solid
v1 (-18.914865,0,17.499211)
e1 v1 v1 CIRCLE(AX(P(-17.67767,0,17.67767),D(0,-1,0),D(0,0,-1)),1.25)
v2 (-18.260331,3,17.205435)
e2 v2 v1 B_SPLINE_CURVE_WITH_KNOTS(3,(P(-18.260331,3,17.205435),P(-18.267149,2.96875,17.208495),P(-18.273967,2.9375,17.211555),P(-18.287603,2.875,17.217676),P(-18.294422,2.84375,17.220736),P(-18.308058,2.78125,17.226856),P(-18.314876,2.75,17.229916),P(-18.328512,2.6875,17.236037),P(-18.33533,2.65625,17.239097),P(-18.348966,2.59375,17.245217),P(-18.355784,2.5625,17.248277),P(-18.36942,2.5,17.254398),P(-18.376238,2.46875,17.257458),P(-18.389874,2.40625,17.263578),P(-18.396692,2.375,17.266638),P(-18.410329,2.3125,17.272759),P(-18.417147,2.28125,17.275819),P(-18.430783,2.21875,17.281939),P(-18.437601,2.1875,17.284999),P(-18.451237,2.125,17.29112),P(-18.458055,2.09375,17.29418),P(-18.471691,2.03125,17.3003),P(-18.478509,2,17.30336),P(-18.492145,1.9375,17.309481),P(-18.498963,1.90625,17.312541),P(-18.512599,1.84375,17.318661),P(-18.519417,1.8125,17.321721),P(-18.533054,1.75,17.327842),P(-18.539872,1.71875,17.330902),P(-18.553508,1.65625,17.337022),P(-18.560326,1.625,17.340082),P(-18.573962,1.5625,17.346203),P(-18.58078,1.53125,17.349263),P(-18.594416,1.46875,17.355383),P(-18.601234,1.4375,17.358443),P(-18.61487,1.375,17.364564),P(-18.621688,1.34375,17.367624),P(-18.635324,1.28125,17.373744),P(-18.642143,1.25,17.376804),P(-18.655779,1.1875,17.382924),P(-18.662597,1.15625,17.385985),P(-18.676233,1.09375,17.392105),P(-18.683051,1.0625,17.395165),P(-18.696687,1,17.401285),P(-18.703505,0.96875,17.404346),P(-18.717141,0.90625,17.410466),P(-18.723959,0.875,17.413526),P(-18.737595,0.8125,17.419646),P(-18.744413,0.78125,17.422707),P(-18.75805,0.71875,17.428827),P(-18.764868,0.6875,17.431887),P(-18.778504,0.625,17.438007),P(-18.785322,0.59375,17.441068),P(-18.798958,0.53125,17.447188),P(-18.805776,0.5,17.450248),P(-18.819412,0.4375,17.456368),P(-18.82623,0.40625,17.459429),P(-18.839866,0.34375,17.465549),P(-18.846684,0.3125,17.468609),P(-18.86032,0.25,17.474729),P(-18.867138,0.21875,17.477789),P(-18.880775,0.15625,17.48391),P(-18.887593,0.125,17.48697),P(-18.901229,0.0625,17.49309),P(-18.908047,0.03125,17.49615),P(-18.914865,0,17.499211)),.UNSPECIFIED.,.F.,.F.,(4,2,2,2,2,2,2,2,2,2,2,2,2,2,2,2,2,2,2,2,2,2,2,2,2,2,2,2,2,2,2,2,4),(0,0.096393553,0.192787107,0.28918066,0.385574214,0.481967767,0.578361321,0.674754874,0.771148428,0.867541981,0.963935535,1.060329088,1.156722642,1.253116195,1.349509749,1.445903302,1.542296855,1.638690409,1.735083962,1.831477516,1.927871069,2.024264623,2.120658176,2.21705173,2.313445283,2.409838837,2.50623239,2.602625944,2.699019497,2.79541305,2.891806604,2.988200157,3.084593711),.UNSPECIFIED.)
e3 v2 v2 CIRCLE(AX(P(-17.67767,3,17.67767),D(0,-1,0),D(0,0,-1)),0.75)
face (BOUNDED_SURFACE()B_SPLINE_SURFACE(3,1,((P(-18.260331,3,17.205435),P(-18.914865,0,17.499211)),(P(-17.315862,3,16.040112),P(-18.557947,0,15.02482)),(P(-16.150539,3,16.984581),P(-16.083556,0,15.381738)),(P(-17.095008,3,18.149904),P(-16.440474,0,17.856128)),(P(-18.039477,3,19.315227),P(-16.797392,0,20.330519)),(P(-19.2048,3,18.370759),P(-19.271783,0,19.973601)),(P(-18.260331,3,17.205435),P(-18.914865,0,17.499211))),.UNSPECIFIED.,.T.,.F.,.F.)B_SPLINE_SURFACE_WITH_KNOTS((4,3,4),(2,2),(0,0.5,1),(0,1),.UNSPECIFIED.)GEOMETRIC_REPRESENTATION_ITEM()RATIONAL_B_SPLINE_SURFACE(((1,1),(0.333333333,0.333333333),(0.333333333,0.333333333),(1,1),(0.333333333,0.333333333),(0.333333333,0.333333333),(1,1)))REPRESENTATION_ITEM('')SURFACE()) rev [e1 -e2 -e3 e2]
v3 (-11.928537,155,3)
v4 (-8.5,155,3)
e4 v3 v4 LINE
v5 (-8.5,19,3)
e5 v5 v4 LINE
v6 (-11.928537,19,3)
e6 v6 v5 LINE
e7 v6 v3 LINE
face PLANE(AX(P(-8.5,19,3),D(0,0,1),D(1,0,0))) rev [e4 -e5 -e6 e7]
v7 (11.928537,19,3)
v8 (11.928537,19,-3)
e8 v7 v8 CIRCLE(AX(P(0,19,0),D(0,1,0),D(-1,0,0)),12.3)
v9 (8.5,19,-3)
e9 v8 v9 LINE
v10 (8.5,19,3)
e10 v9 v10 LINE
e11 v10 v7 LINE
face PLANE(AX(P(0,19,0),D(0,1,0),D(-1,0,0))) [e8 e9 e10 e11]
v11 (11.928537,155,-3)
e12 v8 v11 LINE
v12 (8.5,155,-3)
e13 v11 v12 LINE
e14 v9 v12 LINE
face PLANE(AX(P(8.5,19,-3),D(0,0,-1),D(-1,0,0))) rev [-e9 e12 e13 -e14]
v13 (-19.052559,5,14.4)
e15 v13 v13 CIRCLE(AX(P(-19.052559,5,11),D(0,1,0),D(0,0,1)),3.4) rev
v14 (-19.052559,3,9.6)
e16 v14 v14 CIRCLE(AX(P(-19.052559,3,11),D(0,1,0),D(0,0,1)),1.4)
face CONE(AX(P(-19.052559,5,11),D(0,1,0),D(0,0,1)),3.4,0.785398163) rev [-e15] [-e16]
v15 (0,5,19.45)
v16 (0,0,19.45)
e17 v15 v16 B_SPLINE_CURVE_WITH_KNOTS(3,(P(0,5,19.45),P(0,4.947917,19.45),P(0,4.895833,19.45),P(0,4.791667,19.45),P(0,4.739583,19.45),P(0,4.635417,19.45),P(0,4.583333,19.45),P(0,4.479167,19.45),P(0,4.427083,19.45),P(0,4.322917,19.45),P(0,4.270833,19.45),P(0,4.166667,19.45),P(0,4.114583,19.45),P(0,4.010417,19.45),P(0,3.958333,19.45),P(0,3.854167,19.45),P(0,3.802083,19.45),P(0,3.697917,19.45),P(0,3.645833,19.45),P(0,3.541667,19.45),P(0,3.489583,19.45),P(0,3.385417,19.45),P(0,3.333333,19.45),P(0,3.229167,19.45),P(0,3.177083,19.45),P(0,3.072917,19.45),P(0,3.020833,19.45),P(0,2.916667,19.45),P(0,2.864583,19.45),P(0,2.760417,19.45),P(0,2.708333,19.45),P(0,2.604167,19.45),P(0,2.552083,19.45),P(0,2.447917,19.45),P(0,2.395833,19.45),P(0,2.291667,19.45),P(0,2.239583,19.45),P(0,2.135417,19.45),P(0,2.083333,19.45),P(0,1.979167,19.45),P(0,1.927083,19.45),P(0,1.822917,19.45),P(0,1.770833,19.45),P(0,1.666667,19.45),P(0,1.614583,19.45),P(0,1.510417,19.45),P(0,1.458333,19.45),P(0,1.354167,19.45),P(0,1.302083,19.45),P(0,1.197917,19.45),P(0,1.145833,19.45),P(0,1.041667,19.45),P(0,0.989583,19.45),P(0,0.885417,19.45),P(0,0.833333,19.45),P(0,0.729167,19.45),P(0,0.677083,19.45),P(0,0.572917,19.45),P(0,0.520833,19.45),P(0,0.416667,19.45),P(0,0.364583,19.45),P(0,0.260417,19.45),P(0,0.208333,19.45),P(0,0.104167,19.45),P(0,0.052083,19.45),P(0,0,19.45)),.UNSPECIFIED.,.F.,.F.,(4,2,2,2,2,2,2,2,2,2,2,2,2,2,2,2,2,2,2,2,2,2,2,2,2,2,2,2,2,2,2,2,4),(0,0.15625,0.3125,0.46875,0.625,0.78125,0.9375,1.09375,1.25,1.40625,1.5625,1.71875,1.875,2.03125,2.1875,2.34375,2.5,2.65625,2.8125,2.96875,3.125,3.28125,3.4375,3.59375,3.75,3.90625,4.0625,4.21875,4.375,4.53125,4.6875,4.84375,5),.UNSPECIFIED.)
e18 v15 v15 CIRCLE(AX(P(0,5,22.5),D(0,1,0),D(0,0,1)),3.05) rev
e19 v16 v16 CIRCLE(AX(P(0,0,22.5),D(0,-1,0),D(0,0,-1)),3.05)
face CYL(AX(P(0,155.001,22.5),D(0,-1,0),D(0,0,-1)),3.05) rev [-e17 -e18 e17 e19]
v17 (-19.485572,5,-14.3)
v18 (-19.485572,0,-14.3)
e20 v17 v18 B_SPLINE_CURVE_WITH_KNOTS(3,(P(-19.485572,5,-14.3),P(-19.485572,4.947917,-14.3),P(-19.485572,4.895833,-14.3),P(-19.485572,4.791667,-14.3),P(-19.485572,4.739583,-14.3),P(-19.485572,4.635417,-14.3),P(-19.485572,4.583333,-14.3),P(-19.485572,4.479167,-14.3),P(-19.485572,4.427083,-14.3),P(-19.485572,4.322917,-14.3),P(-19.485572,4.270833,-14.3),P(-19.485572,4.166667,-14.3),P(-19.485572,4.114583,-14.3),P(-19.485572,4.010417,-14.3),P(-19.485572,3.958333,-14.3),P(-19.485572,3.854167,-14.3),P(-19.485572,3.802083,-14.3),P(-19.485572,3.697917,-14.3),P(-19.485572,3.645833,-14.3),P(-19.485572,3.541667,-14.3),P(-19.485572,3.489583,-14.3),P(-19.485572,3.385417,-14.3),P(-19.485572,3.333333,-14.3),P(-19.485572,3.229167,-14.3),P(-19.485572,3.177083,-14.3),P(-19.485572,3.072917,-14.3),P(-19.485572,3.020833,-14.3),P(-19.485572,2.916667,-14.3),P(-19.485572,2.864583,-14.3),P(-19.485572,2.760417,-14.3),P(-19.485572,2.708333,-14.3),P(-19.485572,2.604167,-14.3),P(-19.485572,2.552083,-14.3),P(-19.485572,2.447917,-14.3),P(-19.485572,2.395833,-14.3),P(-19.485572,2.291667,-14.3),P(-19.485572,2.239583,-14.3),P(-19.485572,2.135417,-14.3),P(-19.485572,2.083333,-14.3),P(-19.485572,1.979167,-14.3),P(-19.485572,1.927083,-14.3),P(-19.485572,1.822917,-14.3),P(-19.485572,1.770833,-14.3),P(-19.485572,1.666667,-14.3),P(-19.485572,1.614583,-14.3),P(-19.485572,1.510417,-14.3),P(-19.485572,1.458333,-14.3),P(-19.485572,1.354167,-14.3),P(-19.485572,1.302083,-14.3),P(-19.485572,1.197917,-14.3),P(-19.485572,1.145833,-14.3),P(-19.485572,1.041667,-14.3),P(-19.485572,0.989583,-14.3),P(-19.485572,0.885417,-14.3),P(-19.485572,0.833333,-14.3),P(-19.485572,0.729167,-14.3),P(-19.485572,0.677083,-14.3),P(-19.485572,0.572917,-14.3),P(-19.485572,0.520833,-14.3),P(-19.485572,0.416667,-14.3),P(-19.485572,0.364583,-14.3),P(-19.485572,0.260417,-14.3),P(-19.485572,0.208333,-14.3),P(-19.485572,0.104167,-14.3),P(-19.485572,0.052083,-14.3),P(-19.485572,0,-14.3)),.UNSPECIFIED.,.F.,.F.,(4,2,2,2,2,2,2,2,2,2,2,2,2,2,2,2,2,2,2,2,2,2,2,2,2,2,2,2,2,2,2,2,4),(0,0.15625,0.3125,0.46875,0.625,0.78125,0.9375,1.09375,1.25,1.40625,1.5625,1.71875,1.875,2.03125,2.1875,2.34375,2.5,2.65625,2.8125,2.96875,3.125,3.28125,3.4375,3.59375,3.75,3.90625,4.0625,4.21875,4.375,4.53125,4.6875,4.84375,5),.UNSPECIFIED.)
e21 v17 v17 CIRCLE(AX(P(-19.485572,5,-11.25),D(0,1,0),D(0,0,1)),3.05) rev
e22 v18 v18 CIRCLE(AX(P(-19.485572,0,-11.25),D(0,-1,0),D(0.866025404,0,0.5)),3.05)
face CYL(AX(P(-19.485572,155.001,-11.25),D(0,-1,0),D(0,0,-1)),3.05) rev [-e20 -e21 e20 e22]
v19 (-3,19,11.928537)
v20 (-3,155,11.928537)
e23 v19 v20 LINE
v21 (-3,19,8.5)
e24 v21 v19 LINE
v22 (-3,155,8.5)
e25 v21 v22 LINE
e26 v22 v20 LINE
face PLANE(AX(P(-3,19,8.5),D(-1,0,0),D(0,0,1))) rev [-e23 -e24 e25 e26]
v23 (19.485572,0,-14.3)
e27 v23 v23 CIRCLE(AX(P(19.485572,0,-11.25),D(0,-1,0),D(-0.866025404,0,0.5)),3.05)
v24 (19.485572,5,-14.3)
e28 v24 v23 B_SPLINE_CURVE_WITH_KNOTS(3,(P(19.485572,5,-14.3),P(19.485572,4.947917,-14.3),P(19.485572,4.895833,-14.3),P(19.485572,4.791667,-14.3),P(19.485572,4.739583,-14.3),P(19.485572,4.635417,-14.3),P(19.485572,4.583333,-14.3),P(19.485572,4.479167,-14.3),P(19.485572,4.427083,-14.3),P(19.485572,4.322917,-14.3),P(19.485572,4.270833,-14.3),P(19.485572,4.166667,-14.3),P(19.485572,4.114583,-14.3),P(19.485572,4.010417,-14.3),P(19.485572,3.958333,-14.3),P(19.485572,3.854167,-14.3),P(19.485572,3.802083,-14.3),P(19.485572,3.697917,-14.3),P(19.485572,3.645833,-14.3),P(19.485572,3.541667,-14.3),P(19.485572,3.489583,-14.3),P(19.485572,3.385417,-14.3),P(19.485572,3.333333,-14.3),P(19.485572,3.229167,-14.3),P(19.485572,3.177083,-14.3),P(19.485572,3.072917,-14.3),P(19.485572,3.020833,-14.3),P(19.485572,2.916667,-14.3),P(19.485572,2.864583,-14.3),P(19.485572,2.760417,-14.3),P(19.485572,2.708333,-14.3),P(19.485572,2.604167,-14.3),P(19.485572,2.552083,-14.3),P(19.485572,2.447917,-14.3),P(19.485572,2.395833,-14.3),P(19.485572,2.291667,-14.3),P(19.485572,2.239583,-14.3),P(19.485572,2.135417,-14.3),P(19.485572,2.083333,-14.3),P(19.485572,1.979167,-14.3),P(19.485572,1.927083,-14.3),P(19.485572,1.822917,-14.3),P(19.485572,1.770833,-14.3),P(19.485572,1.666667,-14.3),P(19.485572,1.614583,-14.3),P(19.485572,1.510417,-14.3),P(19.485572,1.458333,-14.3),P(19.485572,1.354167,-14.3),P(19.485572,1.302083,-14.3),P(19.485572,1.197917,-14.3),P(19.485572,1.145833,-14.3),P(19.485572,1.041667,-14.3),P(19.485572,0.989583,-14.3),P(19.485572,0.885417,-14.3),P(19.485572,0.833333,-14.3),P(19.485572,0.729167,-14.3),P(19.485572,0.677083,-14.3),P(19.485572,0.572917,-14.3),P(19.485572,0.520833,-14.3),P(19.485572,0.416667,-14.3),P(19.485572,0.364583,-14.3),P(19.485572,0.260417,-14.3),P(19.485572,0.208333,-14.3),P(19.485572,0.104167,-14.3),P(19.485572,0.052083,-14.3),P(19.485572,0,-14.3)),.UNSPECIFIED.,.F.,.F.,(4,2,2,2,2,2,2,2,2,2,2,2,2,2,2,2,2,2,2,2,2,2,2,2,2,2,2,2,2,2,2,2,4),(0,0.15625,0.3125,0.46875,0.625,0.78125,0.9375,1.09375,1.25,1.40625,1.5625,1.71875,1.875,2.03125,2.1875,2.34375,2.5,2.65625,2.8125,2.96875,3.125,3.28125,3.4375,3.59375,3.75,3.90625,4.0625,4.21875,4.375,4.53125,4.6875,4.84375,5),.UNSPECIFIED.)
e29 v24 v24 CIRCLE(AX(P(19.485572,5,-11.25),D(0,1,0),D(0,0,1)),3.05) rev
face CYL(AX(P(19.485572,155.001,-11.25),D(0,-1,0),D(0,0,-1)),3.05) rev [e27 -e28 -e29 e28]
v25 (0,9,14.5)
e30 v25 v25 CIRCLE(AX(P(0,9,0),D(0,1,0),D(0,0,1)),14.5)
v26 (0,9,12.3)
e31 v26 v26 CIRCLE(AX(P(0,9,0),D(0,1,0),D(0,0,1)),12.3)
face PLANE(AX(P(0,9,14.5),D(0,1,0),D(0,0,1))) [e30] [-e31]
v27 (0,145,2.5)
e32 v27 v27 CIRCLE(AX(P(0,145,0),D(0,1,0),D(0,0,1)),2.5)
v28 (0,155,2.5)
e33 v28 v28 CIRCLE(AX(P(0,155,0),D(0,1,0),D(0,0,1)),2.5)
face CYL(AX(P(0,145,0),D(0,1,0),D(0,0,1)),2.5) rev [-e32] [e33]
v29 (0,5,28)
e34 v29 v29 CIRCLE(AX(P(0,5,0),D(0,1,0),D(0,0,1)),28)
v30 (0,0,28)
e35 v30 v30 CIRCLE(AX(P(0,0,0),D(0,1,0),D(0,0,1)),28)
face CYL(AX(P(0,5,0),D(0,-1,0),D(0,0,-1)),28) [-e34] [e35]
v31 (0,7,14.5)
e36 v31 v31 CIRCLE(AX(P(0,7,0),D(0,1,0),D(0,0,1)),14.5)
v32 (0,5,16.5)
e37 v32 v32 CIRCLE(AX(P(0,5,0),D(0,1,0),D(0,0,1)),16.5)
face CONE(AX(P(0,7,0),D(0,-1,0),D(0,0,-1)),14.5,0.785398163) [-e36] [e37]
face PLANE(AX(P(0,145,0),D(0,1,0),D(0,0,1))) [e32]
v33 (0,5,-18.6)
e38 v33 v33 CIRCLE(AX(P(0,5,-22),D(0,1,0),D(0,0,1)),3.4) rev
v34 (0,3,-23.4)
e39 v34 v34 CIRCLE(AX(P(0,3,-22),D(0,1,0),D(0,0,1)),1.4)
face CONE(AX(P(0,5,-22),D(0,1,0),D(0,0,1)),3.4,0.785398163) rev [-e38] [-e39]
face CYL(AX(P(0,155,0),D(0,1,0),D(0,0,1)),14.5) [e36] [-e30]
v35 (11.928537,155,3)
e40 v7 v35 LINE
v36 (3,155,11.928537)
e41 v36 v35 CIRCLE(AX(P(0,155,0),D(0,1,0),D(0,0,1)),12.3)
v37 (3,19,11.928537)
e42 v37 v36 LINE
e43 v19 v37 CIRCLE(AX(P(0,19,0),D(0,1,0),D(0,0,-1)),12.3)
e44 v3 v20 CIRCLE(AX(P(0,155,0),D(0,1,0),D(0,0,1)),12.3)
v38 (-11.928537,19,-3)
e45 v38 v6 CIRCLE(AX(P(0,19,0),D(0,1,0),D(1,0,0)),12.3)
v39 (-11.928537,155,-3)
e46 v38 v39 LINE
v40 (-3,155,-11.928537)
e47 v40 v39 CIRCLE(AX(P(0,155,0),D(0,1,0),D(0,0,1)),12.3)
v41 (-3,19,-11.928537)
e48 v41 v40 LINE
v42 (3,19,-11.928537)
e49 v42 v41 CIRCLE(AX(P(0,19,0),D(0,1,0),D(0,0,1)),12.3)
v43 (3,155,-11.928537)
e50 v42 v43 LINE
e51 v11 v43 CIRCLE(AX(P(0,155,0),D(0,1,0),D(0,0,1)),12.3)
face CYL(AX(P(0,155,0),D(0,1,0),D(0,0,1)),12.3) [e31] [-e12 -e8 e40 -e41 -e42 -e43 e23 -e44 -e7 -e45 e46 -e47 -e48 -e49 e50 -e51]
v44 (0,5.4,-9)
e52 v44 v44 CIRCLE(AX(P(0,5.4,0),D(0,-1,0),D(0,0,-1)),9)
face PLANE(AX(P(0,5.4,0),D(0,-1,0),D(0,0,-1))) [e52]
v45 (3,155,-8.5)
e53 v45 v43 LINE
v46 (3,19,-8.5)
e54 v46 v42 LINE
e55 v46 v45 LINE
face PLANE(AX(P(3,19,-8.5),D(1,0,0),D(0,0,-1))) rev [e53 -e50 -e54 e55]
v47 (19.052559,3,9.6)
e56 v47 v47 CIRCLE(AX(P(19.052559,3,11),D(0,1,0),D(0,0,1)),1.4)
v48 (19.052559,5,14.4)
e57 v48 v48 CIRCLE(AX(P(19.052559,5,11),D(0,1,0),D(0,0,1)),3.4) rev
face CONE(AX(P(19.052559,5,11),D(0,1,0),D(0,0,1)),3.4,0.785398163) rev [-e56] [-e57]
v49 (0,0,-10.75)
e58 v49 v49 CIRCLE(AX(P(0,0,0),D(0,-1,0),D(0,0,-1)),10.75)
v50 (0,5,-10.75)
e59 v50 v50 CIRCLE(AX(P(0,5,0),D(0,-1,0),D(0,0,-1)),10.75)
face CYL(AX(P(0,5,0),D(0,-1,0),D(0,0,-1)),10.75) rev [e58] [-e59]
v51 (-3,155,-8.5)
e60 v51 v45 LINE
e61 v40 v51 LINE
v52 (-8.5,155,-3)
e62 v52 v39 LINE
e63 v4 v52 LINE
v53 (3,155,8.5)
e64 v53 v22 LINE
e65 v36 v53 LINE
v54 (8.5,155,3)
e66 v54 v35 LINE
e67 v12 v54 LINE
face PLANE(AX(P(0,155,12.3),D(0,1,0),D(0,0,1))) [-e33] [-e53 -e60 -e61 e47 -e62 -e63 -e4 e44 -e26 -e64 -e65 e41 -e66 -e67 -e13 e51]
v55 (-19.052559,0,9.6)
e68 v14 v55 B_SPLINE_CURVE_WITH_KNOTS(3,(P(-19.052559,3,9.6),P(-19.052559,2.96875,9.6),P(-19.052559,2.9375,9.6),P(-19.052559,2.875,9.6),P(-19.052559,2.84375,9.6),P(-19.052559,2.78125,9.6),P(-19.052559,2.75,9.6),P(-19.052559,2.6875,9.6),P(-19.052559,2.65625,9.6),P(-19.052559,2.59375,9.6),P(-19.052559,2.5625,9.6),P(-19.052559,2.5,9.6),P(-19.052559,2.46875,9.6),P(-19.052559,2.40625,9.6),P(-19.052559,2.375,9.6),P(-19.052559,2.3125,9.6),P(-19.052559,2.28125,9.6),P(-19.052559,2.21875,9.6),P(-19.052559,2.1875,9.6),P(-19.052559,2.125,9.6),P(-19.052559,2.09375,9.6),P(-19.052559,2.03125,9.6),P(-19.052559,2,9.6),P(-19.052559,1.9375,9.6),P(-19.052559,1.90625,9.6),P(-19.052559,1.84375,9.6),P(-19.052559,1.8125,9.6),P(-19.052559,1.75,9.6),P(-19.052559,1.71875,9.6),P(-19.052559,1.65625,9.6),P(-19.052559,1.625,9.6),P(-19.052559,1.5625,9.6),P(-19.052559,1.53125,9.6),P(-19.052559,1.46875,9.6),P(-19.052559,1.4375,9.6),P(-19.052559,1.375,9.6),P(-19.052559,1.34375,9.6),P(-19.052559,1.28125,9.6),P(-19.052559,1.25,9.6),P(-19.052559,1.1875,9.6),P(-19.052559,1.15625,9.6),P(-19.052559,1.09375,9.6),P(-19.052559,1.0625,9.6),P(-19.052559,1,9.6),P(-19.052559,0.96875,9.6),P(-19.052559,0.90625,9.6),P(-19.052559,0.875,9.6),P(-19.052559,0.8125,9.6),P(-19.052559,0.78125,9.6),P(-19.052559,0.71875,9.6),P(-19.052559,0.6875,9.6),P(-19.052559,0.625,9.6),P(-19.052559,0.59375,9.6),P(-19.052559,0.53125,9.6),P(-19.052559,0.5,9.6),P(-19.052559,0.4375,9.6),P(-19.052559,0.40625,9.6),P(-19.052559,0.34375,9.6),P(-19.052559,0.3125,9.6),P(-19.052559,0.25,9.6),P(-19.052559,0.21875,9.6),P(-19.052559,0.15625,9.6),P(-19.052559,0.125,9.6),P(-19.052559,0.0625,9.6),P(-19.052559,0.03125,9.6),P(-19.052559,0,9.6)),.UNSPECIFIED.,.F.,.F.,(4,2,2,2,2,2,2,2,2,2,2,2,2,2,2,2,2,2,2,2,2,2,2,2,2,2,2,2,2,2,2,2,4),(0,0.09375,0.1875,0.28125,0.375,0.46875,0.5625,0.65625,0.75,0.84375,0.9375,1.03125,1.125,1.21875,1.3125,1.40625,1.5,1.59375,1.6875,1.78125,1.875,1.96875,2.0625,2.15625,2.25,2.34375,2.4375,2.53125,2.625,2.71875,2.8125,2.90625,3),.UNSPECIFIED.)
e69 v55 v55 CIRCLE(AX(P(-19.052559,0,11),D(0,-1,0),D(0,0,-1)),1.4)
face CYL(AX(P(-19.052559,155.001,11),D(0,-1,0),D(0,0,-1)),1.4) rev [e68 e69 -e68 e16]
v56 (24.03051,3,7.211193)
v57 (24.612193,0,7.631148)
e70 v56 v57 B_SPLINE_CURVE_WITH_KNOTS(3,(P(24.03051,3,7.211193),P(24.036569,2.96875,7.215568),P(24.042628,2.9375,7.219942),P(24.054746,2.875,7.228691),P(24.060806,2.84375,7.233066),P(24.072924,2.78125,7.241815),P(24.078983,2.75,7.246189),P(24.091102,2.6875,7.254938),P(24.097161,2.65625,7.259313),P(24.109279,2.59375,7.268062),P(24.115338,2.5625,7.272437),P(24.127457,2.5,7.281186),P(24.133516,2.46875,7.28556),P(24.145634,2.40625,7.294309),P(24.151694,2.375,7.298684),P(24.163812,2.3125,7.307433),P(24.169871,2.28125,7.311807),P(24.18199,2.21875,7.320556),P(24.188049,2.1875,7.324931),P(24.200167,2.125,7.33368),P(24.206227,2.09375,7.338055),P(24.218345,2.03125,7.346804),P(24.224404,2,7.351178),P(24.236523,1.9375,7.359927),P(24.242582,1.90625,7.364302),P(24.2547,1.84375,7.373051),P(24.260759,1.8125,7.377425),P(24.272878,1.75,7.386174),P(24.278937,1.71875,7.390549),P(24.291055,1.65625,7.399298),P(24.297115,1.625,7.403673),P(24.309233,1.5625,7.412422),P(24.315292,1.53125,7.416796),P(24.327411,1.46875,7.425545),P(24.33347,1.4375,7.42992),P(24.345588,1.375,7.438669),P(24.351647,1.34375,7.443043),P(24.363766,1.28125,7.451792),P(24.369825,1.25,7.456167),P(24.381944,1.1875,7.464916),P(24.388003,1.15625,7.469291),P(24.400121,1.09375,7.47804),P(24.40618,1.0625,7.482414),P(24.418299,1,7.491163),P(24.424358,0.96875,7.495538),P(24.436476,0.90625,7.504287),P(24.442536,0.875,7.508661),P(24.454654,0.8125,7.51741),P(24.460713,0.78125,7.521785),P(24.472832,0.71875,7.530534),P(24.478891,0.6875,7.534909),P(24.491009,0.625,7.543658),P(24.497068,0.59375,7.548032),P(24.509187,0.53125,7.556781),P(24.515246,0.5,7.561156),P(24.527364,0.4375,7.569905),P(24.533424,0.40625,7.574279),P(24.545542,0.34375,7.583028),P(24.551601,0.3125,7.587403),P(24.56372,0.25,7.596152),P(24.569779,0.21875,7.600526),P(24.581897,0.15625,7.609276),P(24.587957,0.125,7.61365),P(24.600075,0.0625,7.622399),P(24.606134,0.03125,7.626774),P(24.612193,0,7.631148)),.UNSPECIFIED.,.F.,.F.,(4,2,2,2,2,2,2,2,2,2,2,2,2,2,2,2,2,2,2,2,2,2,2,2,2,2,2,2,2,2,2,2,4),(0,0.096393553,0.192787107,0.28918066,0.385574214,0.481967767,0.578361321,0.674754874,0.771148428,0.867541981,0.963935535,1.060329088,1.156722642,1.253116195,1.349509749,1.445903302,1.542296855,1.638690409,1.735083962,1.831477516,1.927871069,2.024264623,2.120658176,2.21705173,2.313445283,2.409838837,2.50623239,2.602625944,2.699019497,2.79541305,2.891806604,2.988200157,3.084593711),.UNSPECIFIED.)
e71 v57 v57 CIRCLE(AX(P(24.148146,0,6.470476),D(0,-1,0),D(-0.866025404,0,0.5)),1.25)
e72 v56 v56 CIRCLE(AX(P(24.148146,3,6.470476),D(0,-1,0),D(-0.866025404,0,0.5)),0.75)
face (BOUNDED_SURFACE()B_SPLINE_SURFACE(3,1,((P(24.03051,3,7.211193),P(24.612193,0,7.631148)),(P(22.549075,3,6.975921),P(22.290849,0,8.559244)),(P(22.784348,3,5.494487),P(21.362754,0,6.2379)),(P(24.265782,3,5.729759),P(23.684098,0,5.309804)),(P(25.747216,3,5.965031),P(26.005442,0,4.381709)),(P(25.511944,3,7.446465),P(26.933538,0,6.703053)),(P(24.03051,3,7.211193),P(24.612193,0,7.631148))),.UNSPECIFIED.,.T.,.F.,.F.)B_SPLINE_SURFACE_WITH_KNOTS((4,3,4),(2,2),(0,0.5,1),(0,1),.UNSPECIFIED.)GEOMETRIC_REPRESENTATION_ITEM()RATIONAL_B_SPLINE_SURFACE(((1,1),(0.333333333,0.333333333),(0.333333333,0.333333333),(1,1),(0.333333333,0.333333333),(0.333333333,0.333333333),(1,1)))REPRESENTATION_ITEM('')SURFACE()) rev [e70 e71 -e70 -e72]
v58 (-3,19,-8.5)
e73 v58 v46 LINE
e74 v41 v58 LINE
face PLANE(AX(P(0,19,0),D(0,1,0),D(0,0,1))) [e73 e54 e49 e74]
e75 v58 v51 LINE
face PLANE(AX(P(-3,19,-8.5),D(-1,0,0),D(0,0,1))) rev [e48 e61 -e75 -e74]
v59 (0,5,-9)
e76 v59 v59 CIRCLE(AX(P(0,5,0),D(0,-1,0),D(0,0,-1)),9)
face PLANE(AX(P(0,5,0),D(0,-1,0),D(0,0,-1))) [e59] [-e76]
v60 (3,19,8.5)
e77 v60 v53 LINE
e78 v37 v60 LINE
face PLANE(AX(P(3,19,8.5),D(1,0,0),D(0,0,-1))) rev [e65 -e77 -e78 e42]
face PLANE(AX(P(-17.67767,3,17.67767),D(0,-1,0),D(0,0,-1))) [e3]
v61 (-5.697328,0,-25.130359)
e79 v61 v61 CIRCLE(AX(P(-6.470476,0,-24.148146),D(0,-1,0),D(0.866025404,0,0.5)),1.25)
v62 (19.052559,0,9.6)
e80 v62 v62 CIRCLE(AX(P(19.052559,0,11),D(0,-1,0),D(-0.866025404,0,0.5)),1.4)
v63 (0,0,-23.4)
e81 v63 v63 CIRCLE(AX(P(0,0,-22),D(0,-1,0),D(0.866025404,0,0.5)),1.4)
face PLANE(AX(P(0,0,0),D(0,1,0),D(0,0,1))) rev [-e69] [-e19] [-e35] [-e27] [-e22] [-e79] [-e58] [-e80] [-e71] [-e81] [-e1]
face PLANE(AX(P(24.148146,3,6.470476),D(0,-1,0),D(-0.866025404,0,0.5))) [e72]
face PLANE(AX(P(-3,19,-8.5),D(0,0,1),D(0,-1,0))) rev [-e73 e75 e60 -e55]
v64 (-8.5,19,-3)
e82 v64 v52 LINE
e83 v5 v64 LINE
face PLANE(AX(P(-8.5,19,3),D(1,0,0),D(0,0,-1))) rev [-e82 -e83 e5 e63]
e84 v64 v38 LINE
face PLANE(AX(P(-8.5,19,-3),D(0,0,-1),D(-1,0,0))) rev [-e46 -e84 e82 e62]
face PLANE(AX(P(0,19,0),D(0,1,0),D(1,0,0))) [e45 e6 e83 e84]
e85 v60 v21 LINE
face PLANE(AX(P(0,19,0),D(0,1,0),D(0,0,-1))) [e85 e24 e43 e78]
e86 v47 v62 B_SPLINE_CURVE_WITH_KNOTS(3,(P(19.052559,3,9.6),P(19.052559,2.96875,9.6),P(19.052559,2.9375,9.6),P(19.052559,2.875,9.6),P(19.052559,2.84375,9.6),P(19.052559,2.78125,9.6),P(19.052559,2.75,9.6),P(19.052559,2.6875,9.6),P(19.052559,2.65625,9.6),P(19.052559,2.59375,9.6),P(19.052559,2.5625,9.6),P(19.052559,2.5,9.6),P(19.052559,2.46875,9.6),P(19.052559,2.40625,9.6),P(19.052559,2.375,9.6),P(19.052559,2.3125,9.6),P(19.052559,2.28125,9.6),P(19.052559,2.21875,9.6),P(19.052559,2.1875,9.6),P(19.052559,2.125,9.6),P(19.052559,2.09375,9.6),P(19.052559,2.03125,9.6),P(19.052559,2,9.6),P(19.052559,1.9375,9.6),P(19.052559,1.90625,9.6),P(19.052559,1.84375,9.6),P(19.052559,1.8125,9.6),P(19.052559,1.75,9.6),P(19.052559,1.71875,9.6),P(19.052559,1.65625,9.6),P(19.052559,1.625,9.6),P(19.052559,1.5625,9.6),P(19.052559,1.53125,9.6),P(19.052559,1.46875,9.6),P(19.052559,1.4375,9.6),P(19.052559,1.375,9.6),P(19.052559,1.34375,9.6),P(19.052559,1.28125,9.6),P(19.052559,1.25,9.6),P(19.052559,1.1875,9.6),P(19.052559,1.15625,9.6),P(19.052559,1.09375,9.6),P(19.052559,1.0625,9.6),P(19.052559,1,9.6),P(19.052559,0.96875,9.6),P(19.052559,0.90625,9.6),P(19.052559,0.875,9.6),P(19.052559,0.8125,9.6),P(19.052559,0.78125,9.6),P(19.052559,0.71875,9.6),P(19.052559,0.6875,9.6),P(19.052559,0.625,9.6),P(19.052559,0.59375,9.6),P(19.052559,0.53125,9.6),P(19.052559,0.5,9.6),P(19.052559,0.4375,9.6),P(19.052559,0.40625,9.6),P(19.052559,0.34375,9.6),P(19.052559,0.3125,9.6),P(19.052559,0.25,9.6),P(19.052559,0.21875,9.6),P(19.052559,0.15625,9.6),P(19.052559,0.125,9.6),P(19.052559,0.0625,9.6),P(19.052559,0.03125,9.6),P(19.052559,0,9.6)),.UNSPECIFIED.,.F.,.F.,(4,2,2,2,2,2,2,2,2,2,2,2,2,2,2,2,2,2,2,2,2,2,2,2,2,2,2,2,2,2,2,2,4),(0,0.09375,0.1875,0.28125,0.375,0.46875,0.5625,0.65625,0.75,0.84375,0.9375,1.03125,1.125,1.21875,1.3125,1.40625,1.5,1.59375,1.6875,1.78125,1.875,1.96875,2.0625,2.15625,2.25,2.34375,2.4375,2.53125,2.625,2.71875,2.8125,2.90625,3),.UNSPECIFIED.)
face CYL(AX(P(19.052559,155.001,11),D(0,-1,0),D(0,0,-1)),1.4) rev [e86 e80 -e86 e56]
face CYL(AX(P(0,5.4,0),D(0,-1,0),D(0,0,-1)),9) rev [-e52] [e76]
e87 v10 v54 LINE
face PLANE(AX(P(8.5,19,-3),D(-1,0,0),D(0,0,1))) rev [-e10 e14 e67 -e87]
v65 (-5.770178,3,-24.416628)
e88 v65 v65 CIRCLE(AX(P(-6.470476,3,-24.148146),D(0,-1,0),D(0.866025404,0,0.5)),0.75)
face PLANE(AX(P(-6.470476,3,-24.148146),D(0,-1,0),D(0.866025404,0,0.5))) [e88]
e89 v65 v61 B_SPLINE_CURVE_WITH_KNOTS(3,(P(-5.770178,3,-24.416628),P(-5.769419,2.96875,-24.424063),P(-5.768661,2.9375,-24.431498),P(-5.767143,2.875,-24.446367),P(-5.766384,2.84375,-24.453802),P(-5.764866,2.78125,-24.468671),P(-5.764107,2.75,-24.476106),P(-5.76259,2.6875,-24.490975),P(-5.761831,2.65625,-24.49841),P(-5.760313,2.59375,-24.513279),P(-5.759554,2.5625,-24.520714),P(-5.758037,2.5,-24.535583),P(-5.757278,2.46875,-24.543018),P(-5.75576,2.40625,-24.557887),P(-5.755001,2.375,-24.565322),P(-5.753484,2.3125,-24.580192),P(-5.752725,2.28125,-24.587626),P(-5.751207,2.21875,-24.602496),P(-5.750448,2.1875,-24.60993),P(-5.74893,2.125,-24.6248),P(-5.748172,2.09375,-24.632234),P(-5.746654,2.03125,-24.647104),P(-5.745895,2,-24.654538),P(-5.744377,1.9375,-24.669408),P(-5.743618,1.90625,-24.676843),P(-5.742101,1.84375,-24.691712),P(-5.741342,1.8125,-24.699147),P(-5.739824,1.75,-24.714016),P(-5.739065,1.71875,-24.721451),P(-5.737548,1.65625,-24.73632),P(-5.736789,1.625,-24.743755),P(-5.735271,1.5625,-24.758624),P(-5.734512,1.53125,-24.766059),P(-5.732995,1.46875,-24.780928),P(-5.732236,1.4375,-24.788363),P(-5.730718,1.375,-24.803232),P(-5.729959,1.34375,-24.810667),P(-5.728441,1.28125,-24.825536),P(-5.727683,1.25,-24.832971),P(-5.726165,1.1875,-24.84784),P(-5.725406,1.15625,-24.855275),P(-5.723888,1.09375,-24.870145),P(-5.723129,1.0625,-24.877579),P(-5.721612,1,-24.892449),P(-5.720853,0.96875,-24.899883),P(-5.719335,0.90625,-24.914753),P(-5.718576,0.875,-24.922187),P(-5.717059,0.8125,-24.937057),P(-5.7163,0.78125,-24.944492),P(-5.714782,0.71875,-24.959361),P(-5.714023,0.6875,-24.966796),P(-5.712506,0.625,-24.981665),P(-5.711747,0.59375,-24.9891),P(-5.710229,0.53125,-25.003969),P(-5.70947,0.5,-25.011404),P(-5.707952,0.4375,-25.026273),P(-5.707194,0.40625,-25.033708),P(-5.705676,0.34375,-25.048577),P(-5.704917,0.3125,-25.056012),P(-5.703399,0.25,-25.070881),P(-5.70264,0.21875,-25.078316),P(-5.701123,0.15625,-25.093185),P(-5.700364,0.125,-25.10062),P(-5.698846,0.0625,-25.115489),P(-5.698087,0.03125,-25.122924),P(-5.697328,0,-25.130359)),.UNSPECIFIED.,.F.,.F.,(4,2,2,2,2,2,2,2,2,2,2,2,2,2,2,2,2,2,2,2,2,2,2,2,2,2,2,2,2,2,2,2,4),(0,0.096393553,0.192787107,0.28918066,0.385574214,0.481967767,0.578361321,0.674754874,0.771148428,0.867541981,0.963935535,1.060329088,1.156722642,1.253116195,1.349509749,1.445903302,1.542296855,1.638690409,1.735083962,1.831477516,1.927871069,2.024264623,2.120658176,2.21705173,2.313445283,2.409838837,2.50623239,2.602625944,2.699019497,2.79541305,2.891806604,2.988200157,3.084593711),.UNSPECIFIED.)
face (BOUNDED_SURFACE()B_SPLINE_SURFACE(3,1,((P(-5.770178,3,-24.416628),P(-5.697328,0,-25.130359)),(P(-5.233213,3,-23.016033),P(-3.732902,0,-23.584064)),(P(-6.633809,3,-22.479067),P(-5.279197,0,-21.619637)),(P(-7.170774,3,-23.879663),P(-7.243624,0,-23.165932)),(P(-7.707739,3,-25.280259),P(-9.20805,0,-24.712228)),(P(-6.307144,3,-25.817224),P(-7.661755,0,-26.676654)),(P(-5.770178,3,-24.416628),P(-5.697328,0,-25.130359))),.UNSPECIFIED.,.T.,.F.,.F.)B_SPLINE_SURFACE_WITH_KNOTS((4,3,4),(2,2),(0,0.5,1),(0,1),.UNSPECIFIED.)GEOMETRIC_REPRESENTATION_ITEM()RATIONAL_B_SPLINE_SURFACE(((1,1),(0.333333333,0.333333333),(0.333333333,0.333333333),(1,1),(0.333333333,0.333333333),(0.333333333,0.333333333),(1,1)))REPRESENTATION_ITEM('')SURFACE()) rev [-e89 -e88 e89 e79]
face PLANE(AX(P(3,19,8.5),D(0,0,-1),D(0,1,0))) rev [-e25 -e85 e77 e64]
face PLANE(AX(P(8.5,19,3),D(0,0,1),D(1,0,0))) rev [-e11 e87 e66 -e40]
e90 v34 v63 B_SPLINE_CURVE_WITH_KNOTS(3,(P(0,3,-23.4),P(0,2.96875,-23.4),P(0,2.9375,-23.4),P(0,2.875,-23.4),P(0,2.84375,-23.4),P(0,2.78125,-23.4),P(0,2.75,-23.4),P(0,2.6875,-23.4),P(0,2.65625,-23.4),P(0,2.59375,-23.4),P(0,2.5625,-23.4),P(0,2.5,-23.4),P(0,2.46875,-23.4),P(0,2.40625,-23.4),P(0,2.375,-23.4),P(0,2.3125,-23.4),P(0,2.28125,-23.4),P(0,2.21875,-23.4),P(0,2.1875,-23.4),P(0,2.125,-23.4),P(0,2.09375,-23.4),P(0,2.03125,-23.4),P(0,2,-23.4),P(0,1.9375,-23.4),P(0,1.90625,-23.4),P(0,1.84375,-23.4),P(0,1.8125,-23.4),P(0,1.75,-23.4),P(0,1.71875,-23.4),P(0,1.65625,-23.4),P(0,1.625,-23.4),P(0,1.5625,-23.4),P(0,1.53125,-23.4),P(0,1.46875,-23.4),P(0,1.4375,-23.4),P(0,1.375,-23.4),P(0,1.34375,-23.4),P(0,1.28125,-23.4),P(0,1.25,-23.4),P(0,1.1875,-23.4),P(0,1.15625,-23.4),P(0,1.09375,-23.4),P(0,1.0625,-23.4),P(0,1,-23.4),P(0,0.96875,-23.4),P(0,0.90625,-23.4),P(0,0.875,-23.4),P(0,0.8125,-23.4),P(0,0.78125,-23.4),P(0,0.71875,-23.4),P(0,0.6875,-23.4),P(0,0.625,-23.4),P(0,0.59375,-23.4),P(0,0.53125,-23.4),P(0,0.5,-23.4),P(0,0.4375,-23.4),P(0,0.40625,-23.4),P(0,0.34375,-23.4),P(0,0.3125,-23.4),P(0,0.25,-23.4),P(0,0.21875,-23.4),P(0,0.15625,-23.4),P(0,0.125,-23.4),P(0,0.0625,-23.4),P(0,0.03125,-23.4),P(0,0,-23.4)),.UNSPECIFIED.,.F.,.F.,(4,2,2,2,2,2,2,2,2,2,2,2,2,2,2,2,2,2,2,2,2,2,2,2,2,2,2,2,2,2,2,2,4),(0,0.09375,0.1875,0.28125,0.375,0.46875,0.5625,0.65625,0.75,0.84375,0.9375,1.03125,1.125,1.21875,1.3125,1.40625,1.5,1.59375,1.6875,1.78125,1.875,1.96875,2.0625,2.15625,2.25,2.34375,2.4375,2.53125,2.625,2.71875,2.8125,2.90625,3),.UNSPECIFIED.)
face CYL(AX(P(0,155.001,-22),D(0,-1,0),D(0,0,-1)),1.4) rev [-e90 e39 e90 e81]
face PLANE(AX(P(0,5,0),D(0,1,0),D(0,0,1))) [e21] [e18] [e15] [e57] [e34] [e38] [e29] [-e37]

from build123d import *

# Parameters (mm, degrees)
ESBO_O1_R                = 28
RESSALTO_EXTRUS_O1_DEPTH = 5
ESBO_O6_R                = 10.75
CORTE_EXTRUS_O1_DEPTH    = 5
ESBO_O7_R                = 9
CORTE_EXTRUS_O2_DEPTH    = 0.4
CORTE_EXTRUS_O3_REACH    = 161.978
ESBO_O8_R                = 3.05
PADR_OCIRCULAR1_COUNT    = 3
CORTE_EXTRUS_O4_REACH    = 161.978
ESBO_O9_R                = 1.4
PADR_OCIRCULAR2_COUNT    = 3
PADR_OCIRCULAR3_COUNT    = 3
CHANFRO1_SIZE            = 2
CHANFRO2_SIZE            = 2
CORTE_EXTRUS_O5_DEPTH    = 136
PADR_OCIRCULAR4_COUNT    = 4
ESBO_O18_R               = 2.5
CORTE_EXTRUS_O6_DEPTH    = 10


with BuildPart() as part:
    # Esboço1 → Ressalto-extrusão1 (new body)
    with BuildSketch(Plane(origin=(0, 0, 0), x_dir=(1, 0, 0), z_dir=(0, 1, 0))):
        with Locations(Location((0, 0, 0), (0, 0, 270))):
            Circle(ESBO_O1_R)
    extrude(amount=RESSALTO_EXTRUS_O1_DEPTH)

    # Esboço5 → Revolução1 (revolve)
    with BuildSketch(Plane(origin=(0, 0, 0), x_dir=(0, 0, -1), z_dir=(1, 0, 0))):
        Polygon((0, 5), (-16.5, 5), (-14.5, 7), (-14.5, 9), (-12.3, 9), (-12.3, 155), (0, 155), align=None)
    revolve(axis=Axis((0, 155, 0), (0, -1, 0)))

    # Esboço6 → Corte-extrusão1 (cut)
    with BuildSketch(Plane.XZ):
        with Locations(Location((0, 0, 0), (0, 0, 270))):
            Circle(ESBO_O6_R)
    extrude(amount=-CORTE_EXTRUS_O1_DEPTH, mode=Mode.SUBTRACT)

    # Esboço7 → Corte-extrusão2 (cut)
    with BuildSketch(Plane.XZ.offset(-5)):
        with Locations(Location((0, 0, 0), (0, 0, 270))):
            Circle(ESBO_O7_R)
    extrude(amount=-CORTE_EXTRUS_O2_DEPTH, mode=Mode.SUBTRACT)

    # Esboço8 → Corte-extrusão3 (cut, up to next)
    with BuildSketch(Plane.XZ, mode=Mode.PRIVATE) as corte_extrus_o3_sk1:
        with Locations(Location((0, 22.5, 0), (0, 0, 270))):
            Circle(ESBO_O8_R)
    corte_extrus_o3_tool1 = extrude(corte_extrus_o3_sk1.sketch, amount=-CORTE_EXTRUS_O3_REACH, mode=Mode.PRIVATE) & part.part
    corte_extrus_o3 = corte_extrus_o3_tool1.solids().sort_by_distance((0, 0, 22.5))[0]
    add(corte_extrus_o3, mode=Mode.SUBTRACT)

    # PadrãoCircular1: Corte-extrusão3 ×3 about axis
    padr_ocircular1_axis = Axis((0, 0, 0), (0, 1, 0))
    for i in range(1, PADR_OCIRCULAR1_COUNT):
        add(corte_extrus_o3.rotate(padr_ocircular1_axis, i * 360 / PADR_OCIRCULAR1_COUNT), mode=Mode.SUBTRACT)

    # Esboço9 → Corte-extrusão4 (cut, up to next)
    with BuildSketch(Plane.XZ, mode=Mode.PRIVATE) as corte_extrus_o4_sk1:
        with Locations(Location((-19.052558883, 11, 0), (0, 0, 270))):
            Circle(ESBO_O9_R)
    corte_extrus_o4_tool1 = extrude(corte_extrus_o4_sk1.sketch, amount=-CORTE_EXTRUS_O4_REACH, mode=Mode.PRIVATE) & part.part
    corte_extrus_o4 = corte_extrus_o4_tool1.solids().sort_by_distance((-19.052559, 0, 11))[0]
    add(corte_extrus_o4, mode=Mode.SUBTRACT)

    # PadrãoCircular2: Corte-extrusão4 ×3 about axis
    padr_ocircular2_axis = Axis((0, 0, 0), (0, 1, 0))
    for i in range(1, PADR_OCIRCULAR2_COUNT):
        add(corte_extrus_o4.rotate(padr_ocircular2_axis, i * 360 / PADR_OCIRCULAR2_COUNT), mode=Mode.SUBTRACT)

    # Loft de corte1: read off the stored shape, not the designer's step
    # Loft de corte1: loft between two sections, ruled curve by curve
    loft_de_corte1_from = [
        Edge.make_bspline([(-18.260331243, 3, 17.20543513), (-17.315862444, 3, 16.040111704), (-16.150539018, 3, 16.984580503), (-17.095007817, 3, 18.149903929), (-18.039476615, 3, 19.315227355), (-19.204800042, 3, 18.370758556), (-18.260331243, 3, 17.20543513)], [0, 0, 0, 0, 0.5, 0.5, 0.5, 1, 1, 1, 1], 3, [1, 0.333333333, 0.333333333, 1, 0.333333333, 0.333333333, 1]),
    ]
    loft_de_corte1_to = [
        Edge.make_bspline([(-18.914864913, 0, 17.499210616), (-18.557947085, 0, 15.024819849), (-16.083556319, 0, 15.381737677), (-16.440474147, 0, 17.856128444), (-16.797391974, 0, 20.33051921), (-19.271782741, 0, 19.973601382), (-18.914864913, 0, 17.499210616)], [0, 0, 0, 0, 0.5, 0.5, 0.5, 1, 1, 1, 1], 3, [1, 0.333333333, 0.333333333, 1, 0.333333333, 0.333333333, 1]),
    ]
    loft_de_corte1 = Solid(Shell([*[Face.make_surface_from_curves(loft_de_corte1_from[k], loft_de_corte1_to[k]) for k in range(1)], Face(Wire(loft_de_corte1_from)), Face(Wire(loft_de_corte1_to))]))
    add(loft_de_corte1, mode=Mode.SUBTRACT)

    # PadrãoCircular3: Loft de corte1 ×3 about axis
    padr_ocircular3_axis = Axis((0, 0, 0), (0, 1, 0))
    for i in range(1, PADR_OCIRCULAR3_COUNT):
        add(loft_de_corte1.rotate(padr_ocircular3_axis, i * 360 / PADR_OCIRCULAR3_COUNT), mode=Mode.SUBTRACT)

    # Chanfro1
    chanfro1_edges = [part.edges().sort_by_distance(p)[0] for p in [
        (-19.052558883, 5, 12.4),
    ]]
    chamfer(chanfro1_edges, length=CHANFRO1_SIZE)

    # Chanfro2
    chanfro2_edges = [part.edges().sort_by_distance(p)[0] for p in [
        (20.264994449, 5, 10.3),
        (-1.212435565, 5, -22.7),
    ]]
    chamfer(chanfro2_edges, length=CHANFRO2_SIZE)

    # Esboço17 → Corte-extrusão5 (cut)
    with BuildSketch(Plane(origin=(0, 155, 0), x_dir=(1, 0, 0), z_dir=(0, 1, 0))):
        with BuildLine():
            Line((-3, 8.5), (3, 8.5))
            Line((3, 8.5), (3, 11.928537211))
            ThreePointArc((3, 11.928537211), (0, 12.3), (-3, 11.928537211))
            Line((-3, 11.928537211), (-3, 8.5))
        make_face()
    corte_extrus_o5 = extrude(amount=-CORTE_EXTRUS_O5_DEPTH, mode=Mode.SUBTRACT)

    # PadrãoCircular4: Corte-extrusão5 ×4 about axis
    padr_ocircular4_axis = Axis((0, 0, 0), (0, 1, 0))
    for i in range(1, PADR_OCIRCULAR4_COUNT):
        add(corte_extrus_o5.rotate(padr_ocircular4_axis, i * 360 / PADR_OCIRCULAR4_COUNT), mode=Mode.SUBTRACT)

    # Esboço18 → Corte-extrusão6 (cut)
    with BuildSketch(Plane(origin=(0, 155, 0), x_dir=(1, 0, 0), z_dir=(0, 1, 0))):
        with Locations(Location((0, 0, 0), (0, 0, 270))):
            Circle(ESBO_O18_R)
    extrude(amount=-CORTE_EXTRUS_O6_DEPTH, mode=Mode.SUBTRACT)


solid = part.part
